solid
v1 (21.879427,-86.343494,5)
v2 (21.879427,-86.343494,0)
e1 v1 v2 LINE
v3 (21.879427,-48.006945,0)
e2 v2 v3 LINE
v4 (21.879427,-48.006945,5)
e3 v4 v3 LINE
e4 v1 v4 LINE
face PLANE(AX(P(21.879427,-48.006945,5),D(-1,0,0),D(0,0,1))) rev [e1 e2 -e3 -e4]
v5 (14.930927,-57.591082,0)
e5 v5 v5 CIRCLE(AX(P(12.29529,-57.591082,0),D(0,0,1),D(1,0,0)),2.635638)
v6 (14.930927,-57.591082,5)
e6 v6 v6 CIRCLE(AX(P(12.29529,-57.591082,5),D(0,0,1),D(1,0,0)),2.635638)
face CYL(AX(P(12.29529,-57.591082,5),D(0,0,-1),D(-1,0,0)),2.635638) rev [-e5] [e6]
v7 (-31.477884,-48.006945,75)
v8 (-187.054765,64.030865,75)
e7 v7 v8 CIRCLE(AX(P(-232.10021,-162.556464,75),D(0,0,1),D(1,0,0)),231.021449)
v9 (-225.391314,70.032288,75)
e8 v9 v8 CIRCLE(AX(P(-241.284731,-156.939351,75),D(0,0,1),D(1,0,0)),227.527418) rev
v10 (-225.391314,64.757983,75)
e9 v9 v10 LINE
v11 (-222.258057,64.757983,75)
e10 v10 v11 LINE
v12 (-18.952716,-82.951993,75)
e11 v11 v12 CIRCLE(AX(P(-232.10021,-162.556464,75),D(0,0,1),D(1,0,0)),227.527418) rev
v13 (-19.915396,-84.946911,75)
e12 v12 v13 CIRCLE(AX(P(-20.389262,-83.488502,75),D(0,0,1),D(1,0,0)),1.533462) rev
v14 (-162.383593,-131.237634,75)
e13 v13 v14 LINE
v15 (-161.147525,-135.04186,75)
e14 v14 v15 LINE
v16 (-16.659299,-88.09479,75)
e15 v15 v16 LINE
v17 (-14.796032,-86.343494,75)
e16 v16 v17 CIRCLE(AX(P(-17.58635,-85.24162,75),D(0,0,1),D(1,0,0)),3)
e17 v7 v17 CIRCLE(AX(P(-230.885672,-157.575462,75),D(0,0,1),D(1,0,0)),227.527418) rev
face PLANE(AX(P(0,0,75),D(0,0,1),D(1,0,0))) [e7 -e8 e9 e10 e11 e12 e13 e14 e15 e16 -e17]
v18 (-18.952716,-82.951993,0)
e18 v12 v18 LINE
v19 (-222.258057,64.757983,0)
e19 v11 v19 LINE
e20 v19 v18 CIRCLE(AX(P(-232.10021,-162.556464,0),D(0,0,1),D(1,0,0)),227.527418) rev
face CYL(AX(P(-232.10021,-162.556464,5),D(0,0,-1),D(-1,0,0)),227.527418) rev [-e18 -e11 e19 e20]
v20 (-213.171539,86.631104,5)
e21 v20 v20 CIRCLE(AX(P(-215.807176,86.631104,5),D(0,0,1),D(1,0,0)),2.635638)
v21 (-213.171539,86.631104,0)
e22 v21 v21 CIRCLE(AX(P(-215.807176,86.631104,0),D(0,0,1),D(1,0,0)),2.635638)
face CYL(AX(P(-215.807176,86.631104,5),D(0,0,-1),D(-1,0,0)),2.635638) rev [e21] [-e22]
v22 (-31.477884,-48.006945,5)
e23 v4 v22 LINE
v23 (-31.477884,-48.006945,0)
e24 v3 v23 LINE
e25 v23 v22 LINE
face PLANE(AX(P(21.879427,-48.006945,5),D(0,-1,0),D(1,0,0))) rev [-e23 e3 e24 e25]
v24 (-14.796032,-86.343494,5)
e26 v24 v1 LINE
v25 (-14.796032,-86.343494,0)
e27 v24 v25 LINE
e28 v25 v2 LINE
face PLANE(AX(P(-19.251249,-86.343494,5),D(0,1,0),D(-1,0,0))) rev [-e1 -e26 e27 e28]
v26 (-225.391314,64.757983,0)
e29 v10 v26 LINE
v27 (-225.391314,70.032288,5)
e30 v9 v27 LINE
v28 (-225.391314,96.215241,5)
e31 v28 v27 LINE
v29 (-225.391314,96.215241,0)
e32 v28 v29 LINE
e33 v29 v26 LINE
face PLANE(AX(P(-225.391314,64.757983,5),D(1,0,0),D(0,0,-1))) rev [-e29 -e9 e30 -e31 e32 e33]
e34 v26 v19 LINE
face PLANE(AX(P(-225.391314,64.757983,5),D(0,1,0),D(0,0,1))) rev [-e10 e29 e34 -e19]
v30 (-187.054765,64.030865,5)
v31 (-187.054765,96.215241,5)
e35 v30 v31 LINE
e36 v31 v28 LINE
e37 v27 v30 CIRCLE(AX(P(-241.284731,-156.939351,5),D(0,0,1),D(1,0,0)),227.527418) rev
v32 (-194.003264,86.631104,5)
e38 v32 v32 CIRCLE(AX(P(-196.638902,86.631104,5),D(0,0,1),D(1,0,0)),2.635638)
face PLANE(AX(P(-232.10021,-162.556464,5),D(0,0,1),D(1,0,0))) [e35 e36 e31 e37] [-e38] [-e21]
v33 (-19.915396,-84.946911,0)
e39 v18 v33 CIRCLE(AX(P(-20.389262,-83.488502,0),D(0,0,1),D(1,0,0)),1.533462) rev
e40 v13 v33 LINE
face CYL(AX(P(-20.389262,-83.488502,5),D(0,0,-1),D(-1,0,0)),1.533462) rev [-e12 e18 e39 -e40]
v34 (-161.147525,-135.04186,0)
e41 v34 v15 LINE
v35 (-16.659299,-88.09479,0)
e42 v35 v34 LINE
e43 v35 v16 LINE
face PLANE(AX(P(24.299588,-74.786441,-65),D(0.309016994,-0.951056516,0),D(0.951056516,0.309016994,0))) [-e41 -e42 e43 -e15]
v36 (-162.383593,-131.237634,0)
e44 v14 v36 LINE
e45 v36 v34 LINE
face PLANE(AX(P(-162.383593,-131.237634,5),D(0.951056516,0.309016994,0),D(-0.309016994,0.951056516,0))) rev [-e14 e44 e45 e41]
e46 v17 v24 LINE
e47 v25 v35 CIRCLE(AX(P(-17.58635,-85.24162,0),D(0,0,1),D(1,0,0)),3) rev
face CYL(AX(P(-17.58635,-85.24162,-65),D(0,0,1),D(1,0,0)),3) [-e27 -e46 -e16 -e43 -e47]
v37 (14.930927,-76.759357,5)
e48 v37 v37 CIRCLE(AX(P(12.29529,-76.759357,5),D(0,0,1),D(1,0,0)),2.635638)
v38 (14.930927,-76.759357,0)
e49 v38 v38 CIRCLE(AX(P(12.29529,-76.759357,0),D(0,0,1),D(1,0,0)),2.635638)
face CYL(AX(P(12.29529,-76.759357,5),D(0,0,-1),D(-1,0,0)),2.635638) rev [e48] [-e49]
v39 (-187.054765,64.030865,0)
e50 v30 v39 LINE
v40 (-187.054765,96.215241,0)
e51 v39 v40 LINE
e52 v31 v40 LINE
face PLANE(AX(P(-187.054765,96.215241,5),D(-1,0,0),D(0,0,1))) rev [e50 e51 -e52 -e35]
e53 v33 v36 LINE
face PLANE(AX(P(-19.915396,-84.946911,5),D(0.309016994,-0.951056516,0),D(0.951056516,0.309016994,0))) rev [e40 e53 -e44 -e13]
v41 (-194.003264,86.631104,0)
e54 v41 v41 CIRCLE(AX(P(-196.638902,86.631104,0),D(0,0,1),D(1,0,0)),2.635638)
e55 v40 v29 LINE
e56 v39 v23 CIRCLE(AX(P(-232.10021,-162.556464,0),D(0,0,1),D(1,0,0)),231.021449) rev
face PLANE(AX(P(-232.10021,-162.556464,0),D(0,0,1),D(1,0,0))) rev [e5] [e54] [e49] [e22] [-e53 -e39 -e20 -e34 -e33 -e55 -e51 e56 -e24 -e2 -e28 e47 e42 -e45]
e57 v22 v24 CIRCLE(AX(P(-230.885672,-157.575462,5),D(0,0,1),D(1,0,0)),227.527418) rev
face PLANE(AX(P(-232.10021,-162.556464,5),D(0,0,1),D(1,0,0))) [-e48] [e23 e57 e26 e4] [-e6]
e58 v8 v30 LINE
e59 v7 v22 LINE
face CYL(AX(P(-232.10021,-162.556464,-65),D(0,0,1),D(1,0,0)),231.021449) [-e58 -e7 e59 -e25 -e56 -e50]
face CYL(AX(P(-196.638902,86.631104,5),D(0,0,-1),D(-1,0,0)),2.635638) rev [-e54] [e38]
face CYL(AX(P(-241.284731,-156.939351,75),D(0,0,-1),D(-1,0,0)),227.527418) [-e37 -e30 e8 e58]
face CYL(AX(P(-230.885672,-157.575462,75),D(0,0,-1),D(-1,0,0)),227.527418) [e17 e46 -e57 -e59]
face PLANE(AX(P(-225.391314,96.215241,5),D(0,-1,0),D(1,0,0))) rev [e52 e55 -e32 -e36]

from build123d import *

# Parameters (mm, degrees)
SKETCH_1_R          = 2.6356377382591165
SKETCH_1_R_2        = 2.6356377382590894
SKETCH_1_R_3        = 2.6356377382590765
SKETCH_1_R_4        = 2.635637738259072
EXTRUDE_1_DEPTH     = 5
EXTRUDE_START       = -50
EXTRUDE_2_DEPTH     = 50
FILLET_1_R          = 3
EXTRUDE_START_2     = -70
EXTRUDE_3_DEPTH     = 70
FILLET_2_R          = 3
EXTRUDE_4_DEPTH     = 70
SKETCH_5_W          = 89.0633311885125
SKETCH_5_H          = 295.3242731829526
CUT_EXTRUDE_1_DEPTH = 275.0000000000001


with BuildPart() as part:
    # 스케치1 → 보스-돌출1 (new body)
    with BuildSketch(Plane.XY):
        with BuildLine():
            Line((-161.90972688439834, -132.69604313286513), (-19.251249440125157, -86.34349397662291))
            Line((-19.251249440125157, -86.34349397662291), (21.87942689934009, -86.34349397662294))
            Line((21.87942689934009, -86.34349397662294), (21.87942689934009, -48.00694505649064))
            Line((21.87942689934009, -48.00694505649064), (-33.73868544416714, -48.00694505649063))
            ThreePointArc((-33.73868544416714, -48.00694505649063), (-98.53802186230143, 23.53498808064043), (-187.05476471538051, 62.031590942583435))
            Line((-187.05476471538051, 62.031590942583435), (-187.05476471538051, 96.21524094975992))
            Line((-187.05476471538051, 96.21524094975992), (-225.3913136355128, 96.21524094975996))
            Line((-225.3913136355128, 96.21524094975996), (-225.3913136355128, 64.75798291501623))
            Line((-225.3913136355128, 64.75798291501623), (-222.25805676193863, 64.75798291501623))
            ThreePointArc((-222.25805676193863, 64.75798291501623), (-98.36294899741762, 21.51708345847385), (-18.952715979656908, -82.95199333393413))
            ThreePointArc((-18.952715979656908, -82.95199333393413), (-19.008196216614675, -84.1549577478759), (-19.915396046499477, -84.94691097033295))
            Line((-19.915396046499477, -84.94691097033295), (-162.3835926892786, -131.2376341463548))
            Line((-162.3835926892786, -131.2376341463548), (-161.90972688439834, -132.69604313286513))
        make_face()
        with Locations((-215.8071764054797, 86.63110371972729)):
            Circle(SKETCH_1_R, mode=Mode.SUBTRACT)
        with Locations((-196.63890194541358, 86.6311037197273)):
            Circle(SKETCH_1_R_2, mode=Mode.SUBTRACT)
        with Locations((12.295289669307014, -76.75935674658983)):
            Circle(SKETCH_1_R_3, mode=Mode.SUBTRACT)
        with Locations((12.295289669307014, -57.5910822865237)):
            Circle(SKETCH_1_R_4, mode=Mode.SUBTRACT)
    extrude(amount=EXTRUDE_1_DEPTH)

    # 스케치2 → 보스-돌출2 (add)
    with BuildSketch(Plane.XY.offset(5).offset(EXTRUDE_START)):
        with BuildLine():
            Line((-161.90972688439834, -132.69604313286513), (-19.25124944012515, -86.34349397662291))
            Line((-19.251249440125157, -86.34349397662291), (-17.716653821091654, -86.34349397662291))
            ThreePointArc((-17.71665382109279, -86.34349397662707), (-18.32795901714934, -84.64529234814141), (-18.952715979656915, -82.95199333393413))
            ThreePointArc((-18.95271597965692, -82.95199333393413), (-19.008196216614667, -84.1549577478759), (-19.915396046499477, -84.94691097033295))
            Line((-19.915396046499477, -84.94691097033295), (-162.3835926892786, -131.2376341463548))
            Line((-162.3835926892786, -131.2376341463548), (-161.90972688439834, -132.69604313286513))
        make_face()
        with BuildLine():
            ThreePointArc((-18.952715979656915, -82.95199333393413), (-18.32795901714934, -84.64529234814141), (-17.71665382109279, -86.34349397662707))
            Line((-17.716653821091654, -86.34349397662291), (-16.089863152321414, -86.34349397662291))
            ThreePointArc((-16.08986315232295, -86.34349397662834), (-24.029465542915716, -66.76788414274672), (-33.7386854441672, -48.006945056490636))
            ThreePointArc((-33.7386854441672, -48.006945056490636), (-98.53802186230149, 23.53498808064043), (-187.0547647153805, 62.03159094258342))
            ThreePointArc((-187.0547647153805, 62.03159094258342), (-206.13076342964123, 65.02753015483808), (-225.39131363551047, 66.40614702590713))
            Line((-225.3913136355128, 66.4061470259071), (-225.3913136355128, 64.87202248366495))
            ThreePointArc((-225.3913136355129, 64.87202248366495), (-223.82448876300626, 64.82039980470964), (-222.25805676193858, 64.75798291501621))
            ThreePointArc((-222.25805676193858, 64.75798291501621), (-98.36294899741759, 21.51708345847382), (-18.952715979656915, -82.95199333393413))
        make_face()
    extrude(amount=EXTRUDE_2_DEPTH)

    # 필렛1
    # the kernel refuses this fillet: 3 mm, written as the material it takes off along each edge
    with BuildSketch(Plane(origin=(-16.089863152324853, -86.34349397662284, -55.26319649463599), x_dir=(-0.3411564748454367, 0.9400065210789948, 0), z_dir=(0, 0, 1))) as fillet_1_piece_1:
        with BuildLine():
            CenterArc((4.078395273634998, 2.9998795453949634), FILLET_1_R, 180.53774443113053, 89.97569611298013)
            Line((1.0785274015705548, 2.971723726182023), (0, 0))
            ThreePointArc((0, 0), (2.052639298925323, -0.00919714593498524), (4.105278597850862, -9e-17))
        make_face()
    extrude(amount=55.26319649463599, mode=Mode.SUBTRACT)

    # 스케치3 → 보스-돌출3 (add)
    with BuildSketch(Plane.XY.offset(5).offset(EXTRUDE_START_2)):
        with BuildLine():
            Line((-19.25124944012515, -86.34349397662291), (-161.90972688439834, -132.69604313286513))
            Line((-161.90972688439834, -132.69604313286513), (-161.14752471177883, -135.0418602115354))
            Line((-161.14752471177883, -135.0418602115354), (-13.733764686030042, -87.14422608341849))
            ThreePointArc((-13.73376468603007, -87.1442260834185), (-13.872485363120319, -86.74373244280719), (-14.011940562426247, -86.34349397662855))
            Line((-14.011940562424655, -86.34349397662291), (-19.251249440125157, -86.34349397662291))
        make_face()
        with BuildLine():
            Line((-33.738685444167196, -48.00694505649064), (-31.477883861441427, -48.00694505649064))
            ThreePointArc((-31.477883861440404, -48.00694505648765), (-97.09546483661316, 24.91254341428484), (-187.05476471538535, 64.03086517268349))
            Line((-187.05476471538051, 64.03086517268437), (-187.05476471538051, 62.03159094258343))
            ThreePointArc((-187.0547647153805, 62.03159094258345), (-98.53802186230146, 23.53498808064043), (-33.738685444167174, -48.00694505649062))
        make_face()
        with BuildLine():
            Line((-162.3835926892786, -131.2376341463548), (-161.90972688439834, -132.69604313286513))
            Line((-161.90972688439834, -132.69604313286513), (-19.25124944012515, -86.34349397662291))
            Line((-19.251249440125157, -86.34349397662291), (-14.011940562424655, -86.34349397662291))
            ThreePointArc((-14.011940562426247, -86.34349397662855), (-21.86923355209842, -66.77626462229537), (-31.477883861440404, -48.00694505648765))
            Line((-31.477883861441427, -48.00694505649064), (-33.738685444167196, -48.00694505649064))
            ThreePointArc((-33.738685444167174, -48.00694505649062), (-98.53802186230146, 23.53498808064043), (-187.0547647153805, 62.03159094258345))
            Line((-187.05476471538051, 62.03159094258343), (-187.05476471538051, 64.03086517268437))
            ThreePointArc((-187.05476471538535, 64.03086517268349), (-206.13235139969905, 67.00089307897522), (-225.3913136355111, 68.36755070296968))
            Line((-225.3913136355128, 68.36755070296962), (-225.3913136355128, 64.75798291501623))
            Line((-225.3913136355128, 64.75798291501623), (-222.2580567619386, 64.75798291501621))
            ThreePointArc((-222.2580567619386, 64.75798291501624), (-98.36294899741762, 21.51708345847382), (-18.952715979656915, -82.95199333393413))
            ThreePointArc((-18.95271597965692, -82.95199333393413), (-19.008196216614667, -84.1549577478759), (-19.915396046499477, -84.94691097033295))
            Line((-19.915396046499477, -84.94691097033295), (-162.3835926892786, -131.2376341463548))
        make_face()
    extrude(amount=EXTRUDE_3_DEPTH)

    # 필렛2
    fillet_2_edges = [part.edges().sort_by_distance(p)[0] for p in [
        (-13.733764686030042, -87.14422608341849, -30),
    ]]
    fillet(fillet_2_edges, radius=FILLET_2_R)

    # 스케치4 → 보스-돌출4 (add)
    with BuildSketch(Plane.XY.offset(5)):
        with BuildLine():
            ThreePointArc((-16.659298654257338, -88.09478969169395), (-15.531728736228363, -87.42760572202484), (-14.796031724606808, -86.34349397662291))
            ThreePointArc((-14.796031724606877, -86.34349397662292), (-22.25453577932595, -66.79124041647023), (-31.477883861438727, -48.006945056490636))
            ThreePointArc((-31.4778838614387, -48.006945056490636), (-97.09546483660972, 24.912543414282396), (-187.05476471538054, 64.03086517268255))
            ThreePointArc((-187.0547647153805, 64.03086517268252), (-206.09486736019076, 67.8503266656956), (-225.3913136355128, 70.03228816057364))
            Line((-225.3913136355128, 70.03228816057364), (-225.3913136355128, 64.75798291501623))
            Line((-225.3913136355128, 64.75798291501623), (-222.2580567619386, 64.75798291501621))
            ThreePointArc((-222.2580567619386, 64.75798291501624), (-98.36294899741762, 21.51708345847382), (-18.952715979656915, -82.95199333393413))
            ThreePointArc((-18.95271597965692, -82.95199333393413), (-19.008196216614667, -84.1549577478759), (-19.915396046499477, -84.94691097033295))
            Line((-19.915396046499477, -84.94691097033295), (-162.3835926892786, -131.2376341463548))
            Line((-162.3835926892786, -131.2376341463548), (-161.14752471177886, -135.0418602115354))
            Line((-161.14752471177886, -135.0418602115354), (-16.659298654257327, -88.09478969169395))
        make_face()
    extrude(amount=EXTRUDE_4_DEPTH)

    # 스케치5 → 컷-돌출1 (cut)
    with BuildSketch(Plane.ZY.offset(225.3913136355128)):
        with Locations((-44.53166559425625, -79.29458588850659)):
            Rectangle(SKETCH_5_W, SKETCH_5_H)
    extrude(amount=-CUT_EXTRUDE_1_DEPTH, mode=Mode.SUBTRACT)


solid = part.part
